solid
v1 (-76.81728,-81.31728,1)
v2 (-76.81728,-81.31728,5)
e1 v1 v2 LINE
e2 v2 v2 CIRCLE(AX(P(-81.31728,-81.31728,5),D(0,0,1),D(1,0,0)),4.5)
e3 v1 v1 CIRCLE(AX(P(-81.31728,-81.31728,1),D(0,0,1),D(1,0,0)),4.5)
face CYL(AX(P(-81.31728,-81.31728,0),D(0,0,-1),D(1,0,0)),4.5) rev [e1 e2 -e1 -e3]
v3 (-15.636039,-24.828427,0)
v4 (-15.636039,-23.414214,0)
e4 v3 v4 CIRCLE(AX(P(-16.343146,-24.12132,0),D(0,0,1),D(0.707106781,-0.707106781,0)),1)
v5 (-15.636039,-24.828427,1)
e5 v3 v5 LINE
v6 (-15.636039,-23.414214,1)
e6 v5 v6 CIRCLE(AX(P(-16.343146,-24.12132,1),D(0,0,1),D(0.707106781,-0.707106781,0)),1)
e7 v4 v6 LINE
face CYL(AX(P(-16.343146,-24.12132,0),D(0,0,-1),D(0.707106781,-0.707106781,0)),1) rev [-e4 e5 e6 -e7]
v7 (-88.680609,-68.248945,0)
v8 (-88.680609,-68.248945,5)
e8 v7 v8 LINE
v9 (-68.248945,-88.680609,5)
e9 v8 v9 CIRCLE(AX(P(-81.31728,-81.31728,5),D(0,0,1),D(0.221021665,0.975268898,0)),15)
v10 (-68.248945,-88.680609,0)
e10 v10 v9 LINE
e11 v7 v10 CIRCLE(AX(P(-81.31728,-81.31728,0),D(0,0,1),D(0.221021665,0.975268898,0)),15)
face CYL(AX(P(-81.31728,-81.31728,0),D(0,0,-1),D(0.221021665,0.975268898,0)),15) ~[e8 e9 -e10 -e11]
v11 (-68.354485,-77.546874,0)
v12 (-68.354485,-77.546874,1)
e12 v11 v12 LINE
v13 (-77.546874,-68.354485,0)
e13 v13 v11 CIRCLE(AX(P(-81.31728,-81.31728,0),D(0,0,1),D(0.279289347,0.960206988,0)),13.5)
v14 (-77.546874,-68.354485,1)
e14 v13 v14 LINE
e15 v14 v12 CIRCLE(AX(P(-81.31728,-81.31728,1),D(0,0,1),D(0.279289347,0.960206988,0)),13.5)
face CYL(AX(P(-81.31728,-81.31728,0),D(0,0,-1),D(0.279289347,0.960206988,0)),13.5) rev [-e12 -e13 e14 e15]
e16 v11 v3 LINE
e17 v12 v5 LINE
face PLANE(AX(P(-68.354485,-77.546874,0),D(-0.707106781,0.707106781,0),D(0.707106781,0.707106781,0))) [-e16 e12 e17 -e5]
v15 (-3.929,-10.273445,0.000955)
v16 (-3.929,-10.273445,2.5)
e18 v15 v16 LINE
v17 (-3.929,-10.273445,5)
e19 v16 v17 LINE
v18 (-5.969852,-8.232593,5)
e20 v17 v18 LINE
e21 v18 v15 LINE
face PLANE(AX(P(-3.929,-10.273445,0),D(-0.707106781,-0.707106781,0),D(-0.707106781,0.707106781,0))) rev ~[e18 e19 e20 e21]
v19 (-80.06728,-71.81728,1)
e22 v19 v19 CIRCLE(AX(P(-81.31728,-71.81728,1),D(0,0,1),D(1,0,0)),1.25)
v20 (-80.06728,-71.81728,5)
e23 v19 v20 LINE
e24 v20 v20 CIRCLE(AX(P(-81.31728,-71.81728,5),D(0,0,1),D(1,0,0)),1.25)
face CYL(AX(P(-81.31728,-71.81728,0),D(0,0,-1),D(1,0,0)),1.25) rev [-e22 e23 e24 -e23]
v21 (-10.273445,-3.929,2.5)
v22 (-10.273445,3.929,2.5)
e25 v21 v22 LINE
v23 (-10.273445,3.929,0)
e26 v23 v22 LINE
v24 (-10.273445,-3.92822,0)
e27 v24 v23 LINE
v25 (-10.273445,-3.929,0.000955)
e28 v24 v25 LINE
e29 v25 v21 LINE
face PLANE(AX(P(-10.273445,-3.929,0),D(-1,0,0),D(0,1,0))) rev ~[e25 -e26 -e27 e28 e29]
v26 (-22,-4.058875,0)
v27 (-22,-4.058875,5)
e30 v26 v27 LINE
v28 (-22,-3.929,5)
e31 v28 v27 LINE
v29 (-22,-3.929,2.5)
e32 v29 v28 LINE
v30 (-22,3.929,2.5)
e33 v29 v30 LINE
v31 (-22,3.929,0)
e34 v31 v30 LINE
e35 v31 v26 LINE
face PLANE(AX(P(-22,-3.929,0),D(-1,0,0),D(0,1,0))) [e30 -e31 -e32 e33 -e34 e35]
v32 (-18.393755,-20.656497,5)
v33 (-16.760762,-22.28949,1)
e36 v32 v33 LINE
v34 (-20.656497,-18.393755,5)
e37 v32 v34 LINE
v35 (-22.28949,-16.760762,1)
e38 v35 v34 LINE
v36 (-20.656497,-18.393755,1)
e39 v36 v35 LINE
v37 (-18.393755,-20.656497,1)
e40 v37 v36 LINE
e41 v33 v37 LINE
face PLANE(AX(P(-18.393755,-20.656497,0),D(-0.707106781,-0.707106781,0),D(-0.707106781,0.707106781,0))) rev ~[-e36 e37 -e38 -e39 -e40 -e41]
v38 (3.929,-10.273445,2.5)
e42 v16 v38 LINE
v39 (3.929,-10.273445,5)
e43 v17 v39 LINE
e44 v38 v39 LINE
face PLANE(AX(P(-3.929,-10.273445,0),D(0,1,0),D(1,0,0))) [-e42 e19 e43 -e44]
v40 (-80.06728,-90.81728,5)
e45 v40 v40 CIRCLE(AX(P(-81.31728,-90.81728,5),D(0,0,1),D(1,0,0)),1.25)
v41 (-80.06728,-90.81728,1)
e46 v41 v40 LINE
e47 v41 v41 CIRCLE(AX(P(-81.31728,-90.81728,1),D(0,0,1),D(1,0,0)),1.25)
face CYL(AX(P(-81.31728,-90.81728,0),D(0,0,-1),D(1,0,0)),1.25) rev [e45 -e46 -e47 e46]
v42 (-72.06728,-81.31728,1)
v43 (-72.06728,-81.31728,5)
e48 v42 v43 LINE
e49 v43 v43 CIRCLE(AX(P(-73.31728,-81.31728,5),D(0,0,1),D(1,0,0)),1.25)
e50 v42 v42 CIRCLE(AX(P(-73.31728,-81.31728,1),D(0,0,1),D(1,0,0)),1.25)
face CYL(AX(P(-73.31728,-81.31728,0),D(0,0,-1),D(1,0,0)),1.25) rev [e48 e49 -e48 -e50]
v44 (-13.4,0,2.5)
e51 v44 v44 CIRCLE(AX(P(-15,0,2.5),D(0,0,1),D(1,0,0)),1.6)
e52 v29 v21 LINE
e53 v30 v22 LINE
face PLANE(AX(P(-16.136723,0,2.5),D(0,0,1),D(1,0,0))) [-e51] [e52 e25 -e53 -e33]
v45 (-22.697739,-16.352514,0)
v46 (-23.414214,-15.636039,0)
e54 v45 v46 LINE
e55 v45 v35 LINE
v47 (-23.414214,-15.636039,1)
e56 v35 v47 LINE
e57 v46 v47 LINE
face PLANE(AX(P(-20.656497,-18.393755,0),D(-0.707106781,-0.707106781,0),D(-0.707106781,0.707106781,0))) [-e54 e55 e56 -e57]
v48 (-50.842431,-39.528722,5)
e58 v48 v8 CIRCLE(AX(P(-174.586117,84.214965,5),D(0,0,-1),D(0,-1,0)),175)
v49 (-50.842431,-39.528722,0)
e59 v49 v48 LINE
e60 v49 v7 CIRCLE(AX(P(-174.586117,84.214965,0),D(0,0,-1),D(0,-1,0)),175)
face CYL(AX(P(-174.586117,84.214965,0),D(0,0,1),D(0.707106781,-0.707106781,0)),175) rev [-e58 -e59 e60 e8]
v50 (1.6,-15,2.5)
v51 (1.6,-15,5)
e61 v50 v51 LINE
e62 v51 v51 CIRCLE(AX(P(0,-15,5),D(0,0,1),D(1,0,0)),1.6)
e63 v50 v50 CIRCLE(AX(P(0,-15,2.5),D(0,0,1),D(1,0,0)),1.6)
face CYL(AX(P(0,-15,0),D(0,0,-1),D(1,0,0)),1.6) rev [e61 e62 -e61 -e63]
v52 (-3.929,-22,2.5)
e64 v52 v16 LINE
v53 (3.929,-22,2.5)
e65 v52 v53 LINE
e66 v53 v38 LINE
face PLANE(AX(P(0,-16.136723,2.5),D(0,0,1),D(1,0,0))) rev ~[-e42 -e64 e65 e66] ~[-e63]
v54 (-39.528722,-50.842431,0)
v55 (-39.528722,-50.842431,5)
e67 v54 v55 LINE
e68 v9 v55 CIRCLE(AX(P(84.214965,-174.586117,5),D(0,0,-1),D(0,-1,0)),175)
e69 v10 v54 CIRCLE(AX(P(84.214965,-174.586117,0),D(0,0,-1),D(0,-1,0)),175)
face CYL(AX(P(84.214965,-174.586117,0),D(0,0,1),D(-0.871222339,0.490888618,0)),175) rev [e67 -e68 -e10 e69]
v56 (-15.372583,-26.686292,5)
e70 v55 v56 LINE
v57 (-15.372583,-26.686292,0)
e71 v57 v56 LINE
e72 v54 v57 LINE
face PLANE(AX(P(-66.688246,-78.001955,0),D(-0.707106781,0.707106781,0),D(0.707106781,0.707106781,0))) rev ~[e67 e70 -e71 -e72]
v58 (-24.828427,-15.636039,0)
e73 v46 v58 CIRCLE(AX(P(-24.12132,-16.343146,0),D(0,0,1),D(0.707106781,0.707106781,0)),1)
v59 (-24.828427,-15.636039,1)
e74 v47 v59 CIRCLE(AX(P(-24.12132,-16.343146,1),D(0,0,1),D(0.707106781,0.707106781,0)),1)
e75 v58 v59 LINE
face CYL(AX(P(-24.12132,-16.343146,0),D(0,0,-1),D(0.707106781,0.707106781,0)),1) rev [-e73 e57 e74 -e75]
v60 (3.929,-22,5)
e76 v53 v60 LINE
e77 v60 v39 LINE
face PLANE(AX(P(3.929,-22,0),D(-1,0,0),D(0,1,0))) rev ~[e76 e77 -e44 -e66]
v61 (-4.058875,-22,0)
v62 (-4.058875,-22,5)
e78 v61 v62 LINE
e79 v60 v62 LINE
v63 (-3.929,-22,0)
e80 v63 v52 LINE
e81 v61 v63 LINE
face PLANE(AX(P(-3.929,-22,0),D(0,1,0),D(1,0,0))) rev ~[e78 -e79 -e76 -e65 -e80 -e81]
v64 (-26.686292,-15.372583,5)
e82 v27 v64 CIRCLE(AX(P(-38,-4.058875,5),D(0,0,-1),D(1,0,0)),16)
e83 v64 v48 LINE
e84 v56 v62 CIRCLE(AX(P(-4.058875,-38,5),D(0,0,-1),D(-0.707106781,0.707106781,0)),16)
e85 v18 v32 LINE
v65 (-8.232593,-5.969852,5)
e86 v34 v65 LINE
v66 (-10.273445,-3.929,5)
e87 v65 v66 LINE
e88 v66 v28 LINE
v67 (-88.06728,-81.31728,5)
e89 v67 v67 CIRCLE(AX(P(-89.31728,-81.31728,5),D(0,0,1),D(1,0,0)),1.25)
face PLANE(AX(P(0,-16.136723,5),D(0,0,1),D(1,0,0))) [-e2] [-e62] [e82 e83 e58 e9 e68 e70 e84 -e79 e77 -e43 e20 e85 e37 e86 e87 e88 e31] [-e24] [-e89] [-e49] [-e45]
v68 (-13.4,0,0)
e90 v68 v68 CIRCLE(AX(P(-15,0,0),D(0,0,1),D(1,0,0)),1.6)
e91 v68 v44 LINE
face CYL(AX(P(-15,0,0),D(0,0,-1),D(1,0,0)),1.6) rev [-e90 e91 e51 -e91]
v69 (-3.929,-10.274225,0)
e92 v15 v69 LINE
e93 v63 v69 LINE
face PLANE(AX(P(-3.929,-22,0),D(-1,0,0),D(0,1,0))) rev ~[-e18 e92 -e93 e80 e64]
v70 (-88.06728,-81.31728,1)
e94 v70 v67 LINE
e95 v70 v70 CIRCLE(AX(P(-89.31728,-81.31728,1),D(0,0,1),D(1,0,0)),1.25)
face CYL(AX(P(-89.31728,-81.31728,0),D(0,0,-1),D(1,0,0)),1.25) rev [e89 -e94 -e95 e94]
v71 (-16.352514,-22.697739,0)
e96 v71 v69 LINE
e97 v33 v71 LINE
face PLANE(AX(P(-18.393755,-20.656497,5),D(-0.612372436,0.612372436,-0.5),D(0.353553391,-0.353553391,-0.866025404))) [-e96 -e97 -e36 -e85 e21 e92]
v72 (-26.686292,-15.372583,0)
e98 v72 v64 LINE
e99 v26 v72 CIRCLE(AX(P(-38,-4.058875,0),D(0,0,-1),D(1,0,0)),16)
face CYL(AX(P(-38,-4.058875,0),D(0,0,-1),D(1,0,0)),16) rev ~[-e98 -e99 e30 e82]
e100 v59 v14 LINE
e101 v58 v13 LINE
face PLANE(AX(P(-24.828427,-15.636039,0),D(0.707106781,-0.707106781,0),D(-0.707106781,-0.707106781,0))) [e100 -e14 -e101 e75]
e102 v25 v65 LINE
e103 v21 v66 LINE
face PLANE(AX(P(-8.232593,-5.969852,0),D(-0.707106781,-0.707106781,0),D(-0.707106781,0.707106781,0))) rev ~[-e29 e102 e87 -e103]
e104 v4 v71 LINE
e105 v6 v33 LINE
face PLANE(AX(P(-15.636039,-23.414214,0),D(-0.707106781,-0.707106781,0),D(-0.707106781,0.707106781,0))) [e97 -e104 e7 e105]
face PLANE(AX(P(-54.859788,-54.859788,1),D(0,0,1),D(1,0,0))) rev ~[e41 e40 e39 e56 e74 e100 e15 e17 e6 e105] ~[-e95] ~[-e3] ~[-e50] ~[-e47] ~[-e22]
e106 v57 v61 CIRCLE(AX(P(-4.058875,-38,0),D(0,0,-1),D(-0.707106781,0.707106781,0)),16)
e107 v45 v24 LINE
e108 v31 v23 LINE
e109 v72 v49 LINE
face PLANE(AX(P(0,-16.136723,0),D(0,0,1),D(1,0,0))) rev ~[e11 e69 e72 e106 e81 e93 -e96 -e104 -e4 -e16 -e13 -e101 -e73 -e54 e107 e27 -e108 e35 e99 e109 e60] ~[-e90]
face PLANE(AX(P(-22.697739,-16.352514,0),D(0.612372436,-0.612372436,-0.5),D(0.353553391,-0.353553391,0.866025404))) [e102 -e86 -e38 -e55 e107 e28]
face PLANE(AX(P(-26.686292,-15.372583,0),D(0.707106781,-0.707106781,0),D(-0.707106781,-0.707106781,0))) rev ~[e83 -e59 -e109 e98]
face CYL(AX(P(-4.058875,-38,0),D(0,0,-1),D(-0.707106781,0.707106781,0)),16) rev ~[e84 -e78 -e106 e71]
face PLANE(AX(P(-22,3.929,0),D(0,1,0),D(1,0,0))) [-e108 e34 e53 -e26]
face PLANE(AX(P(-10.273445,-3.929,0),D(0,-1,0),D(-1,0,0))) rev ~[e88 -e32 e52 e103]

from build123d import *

# Parameters (mm, degrees)
F0_R     = 1.25
F0_R_2   = 4.5
F1_DEPTH = 5
F0_W     = 11.7265549134
F0_H     = 7.858
F0_R_3   = 1.6
F2_DEPTH = 2.5
F0_W_2   = 7.858
F0_H_2   = 11.7265549134
F3_DEPTH = 5
F4_DEPTH = 2.5
F5_DEPTH = 1
F6_R     = 175
F8_DEPTH = 25


# Not quite as in the source:
# - a feature names something its author has since deleted; it is built from what else it names


with BuildPart() as f1:
    # F0 (on Top) → F1 (new body)
    with BuildSketch(Plane.XY):
        with BuildLine():
            Line((-10.2734450866, -3.929), (-22, -3.929))
            Line((-22, -3.929), (-22, -4.058874503))
            ThreePointArc((-22, -4.058874503), (-23.2179274798, -10.1818094209), (-26.686291501, -15.372583002))
            Line((-26.686291501, -15.372583002), (-78.0019548635, -66.6882463645))
            ThreePointArc((-78.0019548635, -66.6882463645), (-91.9238815543, -91.9238815543), (-66.6882463645, -78.0019548635))
            Line((-66.6882463645, -78.0019548635), (-15.372583002, -26.686291501))
            ThreePointArc((-15.372583002, -26.686291501), (-10.1818094209, -23.2179274798), (-4.058874503, -22))
            Line((-4.058874503, -22), (-3.929, -22))
            Line((-3.929, -22), (-3.929, -10.2734450866))
            Line((-3.929, -10.2734450866), (-5.9698516934, -8.2325933932))
            Line((-5.9698516934, -8.2325933932), (-18.3937554159, -20.6564971157))
            Line((-18.3937554159, -20.6564971157), (-15.6360389693, -23.4142135624))
            ThreePointArc((-15.6360389693, -23.4142135624), (-15.3431457505, -24.1213203436), (-15.6360389693, -24.8284271247))
            Line((-15.6360389693, -24.8284271247), (-68.3544854934, -77.5468736488))
            ThreePointArc((-68.3544854934, -77.5468736488), (-90.8632213825, -90.8632213825), (-77.5468736488, -68.3544854934))
            Line((-77.5468736488, -68.3544854934), (-24.8284271247, -15.6360389693))
            ThreePointArc((-24.8284271247, -15.6360389693), (-24.1213203436, -15.3431457505), (-23.4142135624, -15.6360389693))
            Line((-23.4142135624, -15.6360389693), (-20.6564971157, -18.3937554159))
            Line((-20.6564971157, -18.3937554159), (-8.2325933932, -5.9698516934))
            Line((-8.2325933932, -5.9698516934), (-10.2734450866, -3.929))
        make_face()
        with BuildLine():
            Line((-18.3937554159, -20.6564971157), (-20.6564971157, -18.3937554159))
            Line((-20.6564971157, -18.3937554159), (-23.4142135624, -15.6360389693))
            ThreePointArc((-23.4142135624, -15.6360389693), (-24.1213203436, -15.3431457505), (-24.8284271247, -15.6360389693))
            Line((-24.8284271247, -15.6360389693), (-77.5468736488, -68.3544854934))
            ThreePointArc((-77.5468736488, -68.3544854934), (-90.8632213825, -90.8632213825), (-68.3544854934, -77.5468736488))
            Line((-68.3544854934, -77.5468736488), (-15.6360389693, -24.8284271247))
            ThreePointArc((-15.6360389693, -24.8284271247), (-15.3431457505, -24.1213203436), (-15.6360389693, -23.4142135624))
            Line((-15.6360389693, -23.4142135624), (-18.3937554159, -20.6564971157))
        make_face()
        with Locations((-81.3172798365, -90.8172798365)):
            Circle(F0_R, mode=Mode.SUBTRACT)
        with Locations((-89.3172798365, -81.3172798365)):
            Circle(F0_R, mode=Mode.SUBTRACT)
        with Locations((-81.3172798365, -81.3172798365)):
            Circle(F0_R_2, mode=Mode.SUBTRACT)
        with Locations((-73.3172798365, -81.3172798365)):
            Circle(F0_R, mode=Mode.SUBTRACT)
        with Locations((-81.3172798365, -71.8172798365)):
            Circle(F0_R, mode=Mode.SUBTRACT)
    extrude(amount=F1_DEPTH)

    # F0 (on Top) → F2 (join)
    with BuildSketch(Plane.XY):
        with Locations((-16.1367225433, 0)):
            Rectangle(F0_W, F0_H)
        with Locations((-15, 0)):
            Circle(F0_R_3, mode=Mode.SUBTRACT)
    extrude(amount=F2_DEPTH)

    # F0 (on Top) → F3 (join)
    with BuildSketch(Plane.XY):
        with Locations((0, -16.1367225433)):
            Rectangle(F0_W_2, F0_H_2)
        with Locations((0, -15)):
            Circle(F0_R_3, mode=Mode.SUBTRACT)
    extrude(amount=F3_DEPTH)

    # F0 (on Top) → F4 (cut)
    with BuildSketch(Plane.XY):
        with Locations((0, -16.1367225433)):
            Rectangle(F0_W_2, F0_H_2)
        with Locations((0, -15)):
            Circle(F0_R_3, mode=Mode.SUBTRACT)
    extrude(amount=F4_DEPTH, mode=Mode.SUBTRACT)

    # F0 (on Top) → F5 (cut)
    with BuildSketch(Plane.XY):
        with BuildLine():
            Line((-18.3937554159, -20.6564971157), (-20.6564971157, -18.3937554159))
            Line((-20.6564971157, -18.3937554159), (-23.4142135624, -15.6360389693))
            ThreePointArc((-23.4142135624, -15.6360389693), (-24.1213203436, -15.3431457505), (-24.8284271247, -15.6360389693))
            Line((-24.8284271247, -15.6360389693), (-77.5468736488, -68.3544854934))
            ThreePointArc((-77.5468736488, -68.3544854934), (-90.8632213825, -90.8632213825), (-68.3544854934, -77.5468736488))
            Line((-68.3544854934, -77.5468736488), (-15.6360389693, -24.8284271247))
            ThreePointArc((-15.6360389693, -24.8284271247), (-15.3431457505, -24.1213203436), (-15.6360389693, -23.4142135624))
            Line((-15.6360389693, -23.4142135624), (-18.3937554159, -20.6564971157))
        make_face()
        with Locations((-81.3172798365, -90.8172798365)):
            Circle(F0_R, mode=Mode.SUBTRACT)
        with Locations((-89.3172798365, -81.3172798365)):
            Circle(F0_R, mode=Mode.SUBTRACT)
        with Locations((-81.3172798365, -81.3172798365)):
            Circle(F0_R_2, mode=Mode.SUBTRACT)
        with Locations((-73.3172798365, -81.3172798365)):
            Circle(F0_R, mode=Mode.SUBTRACT)
        with Locations((-81.3172798365, -71.8172798365)):
            Circle(F0_R, mode=Mode.SUBTRACT)
    extrude(amount=F5_DEPTH, mode=Mode.SUBTRACT)

    # F6
    f6_edges = [f1.edges().sort_by_distance(p)[0] for p in [
        (-66.688246, -78.001955, 2.5),
        (-78.001955, -66.688246, 2.5),
    ]]
    fillet(f6_edges, radius=F6_R)

    # F7 (on face) → F8 (cut)
    with BuildSketch(Plane(origin=(-19.5251262658, -19.5251262658, 0), x_dir=(-0.7071067812, 0.7071067812, 0), z_dir=(0.7071067812, 0.7071067812, 0))):
        Polygon((4.4867513459, 0), (1.6, 5), (1.6, 1), (-1.6, 1), (-1.6, 5), (-4.4867513459, 0), align=None)
    extrude(amount=F8_DEPTH, mode=Mode.SUBTRACT)


solid = f1.part
